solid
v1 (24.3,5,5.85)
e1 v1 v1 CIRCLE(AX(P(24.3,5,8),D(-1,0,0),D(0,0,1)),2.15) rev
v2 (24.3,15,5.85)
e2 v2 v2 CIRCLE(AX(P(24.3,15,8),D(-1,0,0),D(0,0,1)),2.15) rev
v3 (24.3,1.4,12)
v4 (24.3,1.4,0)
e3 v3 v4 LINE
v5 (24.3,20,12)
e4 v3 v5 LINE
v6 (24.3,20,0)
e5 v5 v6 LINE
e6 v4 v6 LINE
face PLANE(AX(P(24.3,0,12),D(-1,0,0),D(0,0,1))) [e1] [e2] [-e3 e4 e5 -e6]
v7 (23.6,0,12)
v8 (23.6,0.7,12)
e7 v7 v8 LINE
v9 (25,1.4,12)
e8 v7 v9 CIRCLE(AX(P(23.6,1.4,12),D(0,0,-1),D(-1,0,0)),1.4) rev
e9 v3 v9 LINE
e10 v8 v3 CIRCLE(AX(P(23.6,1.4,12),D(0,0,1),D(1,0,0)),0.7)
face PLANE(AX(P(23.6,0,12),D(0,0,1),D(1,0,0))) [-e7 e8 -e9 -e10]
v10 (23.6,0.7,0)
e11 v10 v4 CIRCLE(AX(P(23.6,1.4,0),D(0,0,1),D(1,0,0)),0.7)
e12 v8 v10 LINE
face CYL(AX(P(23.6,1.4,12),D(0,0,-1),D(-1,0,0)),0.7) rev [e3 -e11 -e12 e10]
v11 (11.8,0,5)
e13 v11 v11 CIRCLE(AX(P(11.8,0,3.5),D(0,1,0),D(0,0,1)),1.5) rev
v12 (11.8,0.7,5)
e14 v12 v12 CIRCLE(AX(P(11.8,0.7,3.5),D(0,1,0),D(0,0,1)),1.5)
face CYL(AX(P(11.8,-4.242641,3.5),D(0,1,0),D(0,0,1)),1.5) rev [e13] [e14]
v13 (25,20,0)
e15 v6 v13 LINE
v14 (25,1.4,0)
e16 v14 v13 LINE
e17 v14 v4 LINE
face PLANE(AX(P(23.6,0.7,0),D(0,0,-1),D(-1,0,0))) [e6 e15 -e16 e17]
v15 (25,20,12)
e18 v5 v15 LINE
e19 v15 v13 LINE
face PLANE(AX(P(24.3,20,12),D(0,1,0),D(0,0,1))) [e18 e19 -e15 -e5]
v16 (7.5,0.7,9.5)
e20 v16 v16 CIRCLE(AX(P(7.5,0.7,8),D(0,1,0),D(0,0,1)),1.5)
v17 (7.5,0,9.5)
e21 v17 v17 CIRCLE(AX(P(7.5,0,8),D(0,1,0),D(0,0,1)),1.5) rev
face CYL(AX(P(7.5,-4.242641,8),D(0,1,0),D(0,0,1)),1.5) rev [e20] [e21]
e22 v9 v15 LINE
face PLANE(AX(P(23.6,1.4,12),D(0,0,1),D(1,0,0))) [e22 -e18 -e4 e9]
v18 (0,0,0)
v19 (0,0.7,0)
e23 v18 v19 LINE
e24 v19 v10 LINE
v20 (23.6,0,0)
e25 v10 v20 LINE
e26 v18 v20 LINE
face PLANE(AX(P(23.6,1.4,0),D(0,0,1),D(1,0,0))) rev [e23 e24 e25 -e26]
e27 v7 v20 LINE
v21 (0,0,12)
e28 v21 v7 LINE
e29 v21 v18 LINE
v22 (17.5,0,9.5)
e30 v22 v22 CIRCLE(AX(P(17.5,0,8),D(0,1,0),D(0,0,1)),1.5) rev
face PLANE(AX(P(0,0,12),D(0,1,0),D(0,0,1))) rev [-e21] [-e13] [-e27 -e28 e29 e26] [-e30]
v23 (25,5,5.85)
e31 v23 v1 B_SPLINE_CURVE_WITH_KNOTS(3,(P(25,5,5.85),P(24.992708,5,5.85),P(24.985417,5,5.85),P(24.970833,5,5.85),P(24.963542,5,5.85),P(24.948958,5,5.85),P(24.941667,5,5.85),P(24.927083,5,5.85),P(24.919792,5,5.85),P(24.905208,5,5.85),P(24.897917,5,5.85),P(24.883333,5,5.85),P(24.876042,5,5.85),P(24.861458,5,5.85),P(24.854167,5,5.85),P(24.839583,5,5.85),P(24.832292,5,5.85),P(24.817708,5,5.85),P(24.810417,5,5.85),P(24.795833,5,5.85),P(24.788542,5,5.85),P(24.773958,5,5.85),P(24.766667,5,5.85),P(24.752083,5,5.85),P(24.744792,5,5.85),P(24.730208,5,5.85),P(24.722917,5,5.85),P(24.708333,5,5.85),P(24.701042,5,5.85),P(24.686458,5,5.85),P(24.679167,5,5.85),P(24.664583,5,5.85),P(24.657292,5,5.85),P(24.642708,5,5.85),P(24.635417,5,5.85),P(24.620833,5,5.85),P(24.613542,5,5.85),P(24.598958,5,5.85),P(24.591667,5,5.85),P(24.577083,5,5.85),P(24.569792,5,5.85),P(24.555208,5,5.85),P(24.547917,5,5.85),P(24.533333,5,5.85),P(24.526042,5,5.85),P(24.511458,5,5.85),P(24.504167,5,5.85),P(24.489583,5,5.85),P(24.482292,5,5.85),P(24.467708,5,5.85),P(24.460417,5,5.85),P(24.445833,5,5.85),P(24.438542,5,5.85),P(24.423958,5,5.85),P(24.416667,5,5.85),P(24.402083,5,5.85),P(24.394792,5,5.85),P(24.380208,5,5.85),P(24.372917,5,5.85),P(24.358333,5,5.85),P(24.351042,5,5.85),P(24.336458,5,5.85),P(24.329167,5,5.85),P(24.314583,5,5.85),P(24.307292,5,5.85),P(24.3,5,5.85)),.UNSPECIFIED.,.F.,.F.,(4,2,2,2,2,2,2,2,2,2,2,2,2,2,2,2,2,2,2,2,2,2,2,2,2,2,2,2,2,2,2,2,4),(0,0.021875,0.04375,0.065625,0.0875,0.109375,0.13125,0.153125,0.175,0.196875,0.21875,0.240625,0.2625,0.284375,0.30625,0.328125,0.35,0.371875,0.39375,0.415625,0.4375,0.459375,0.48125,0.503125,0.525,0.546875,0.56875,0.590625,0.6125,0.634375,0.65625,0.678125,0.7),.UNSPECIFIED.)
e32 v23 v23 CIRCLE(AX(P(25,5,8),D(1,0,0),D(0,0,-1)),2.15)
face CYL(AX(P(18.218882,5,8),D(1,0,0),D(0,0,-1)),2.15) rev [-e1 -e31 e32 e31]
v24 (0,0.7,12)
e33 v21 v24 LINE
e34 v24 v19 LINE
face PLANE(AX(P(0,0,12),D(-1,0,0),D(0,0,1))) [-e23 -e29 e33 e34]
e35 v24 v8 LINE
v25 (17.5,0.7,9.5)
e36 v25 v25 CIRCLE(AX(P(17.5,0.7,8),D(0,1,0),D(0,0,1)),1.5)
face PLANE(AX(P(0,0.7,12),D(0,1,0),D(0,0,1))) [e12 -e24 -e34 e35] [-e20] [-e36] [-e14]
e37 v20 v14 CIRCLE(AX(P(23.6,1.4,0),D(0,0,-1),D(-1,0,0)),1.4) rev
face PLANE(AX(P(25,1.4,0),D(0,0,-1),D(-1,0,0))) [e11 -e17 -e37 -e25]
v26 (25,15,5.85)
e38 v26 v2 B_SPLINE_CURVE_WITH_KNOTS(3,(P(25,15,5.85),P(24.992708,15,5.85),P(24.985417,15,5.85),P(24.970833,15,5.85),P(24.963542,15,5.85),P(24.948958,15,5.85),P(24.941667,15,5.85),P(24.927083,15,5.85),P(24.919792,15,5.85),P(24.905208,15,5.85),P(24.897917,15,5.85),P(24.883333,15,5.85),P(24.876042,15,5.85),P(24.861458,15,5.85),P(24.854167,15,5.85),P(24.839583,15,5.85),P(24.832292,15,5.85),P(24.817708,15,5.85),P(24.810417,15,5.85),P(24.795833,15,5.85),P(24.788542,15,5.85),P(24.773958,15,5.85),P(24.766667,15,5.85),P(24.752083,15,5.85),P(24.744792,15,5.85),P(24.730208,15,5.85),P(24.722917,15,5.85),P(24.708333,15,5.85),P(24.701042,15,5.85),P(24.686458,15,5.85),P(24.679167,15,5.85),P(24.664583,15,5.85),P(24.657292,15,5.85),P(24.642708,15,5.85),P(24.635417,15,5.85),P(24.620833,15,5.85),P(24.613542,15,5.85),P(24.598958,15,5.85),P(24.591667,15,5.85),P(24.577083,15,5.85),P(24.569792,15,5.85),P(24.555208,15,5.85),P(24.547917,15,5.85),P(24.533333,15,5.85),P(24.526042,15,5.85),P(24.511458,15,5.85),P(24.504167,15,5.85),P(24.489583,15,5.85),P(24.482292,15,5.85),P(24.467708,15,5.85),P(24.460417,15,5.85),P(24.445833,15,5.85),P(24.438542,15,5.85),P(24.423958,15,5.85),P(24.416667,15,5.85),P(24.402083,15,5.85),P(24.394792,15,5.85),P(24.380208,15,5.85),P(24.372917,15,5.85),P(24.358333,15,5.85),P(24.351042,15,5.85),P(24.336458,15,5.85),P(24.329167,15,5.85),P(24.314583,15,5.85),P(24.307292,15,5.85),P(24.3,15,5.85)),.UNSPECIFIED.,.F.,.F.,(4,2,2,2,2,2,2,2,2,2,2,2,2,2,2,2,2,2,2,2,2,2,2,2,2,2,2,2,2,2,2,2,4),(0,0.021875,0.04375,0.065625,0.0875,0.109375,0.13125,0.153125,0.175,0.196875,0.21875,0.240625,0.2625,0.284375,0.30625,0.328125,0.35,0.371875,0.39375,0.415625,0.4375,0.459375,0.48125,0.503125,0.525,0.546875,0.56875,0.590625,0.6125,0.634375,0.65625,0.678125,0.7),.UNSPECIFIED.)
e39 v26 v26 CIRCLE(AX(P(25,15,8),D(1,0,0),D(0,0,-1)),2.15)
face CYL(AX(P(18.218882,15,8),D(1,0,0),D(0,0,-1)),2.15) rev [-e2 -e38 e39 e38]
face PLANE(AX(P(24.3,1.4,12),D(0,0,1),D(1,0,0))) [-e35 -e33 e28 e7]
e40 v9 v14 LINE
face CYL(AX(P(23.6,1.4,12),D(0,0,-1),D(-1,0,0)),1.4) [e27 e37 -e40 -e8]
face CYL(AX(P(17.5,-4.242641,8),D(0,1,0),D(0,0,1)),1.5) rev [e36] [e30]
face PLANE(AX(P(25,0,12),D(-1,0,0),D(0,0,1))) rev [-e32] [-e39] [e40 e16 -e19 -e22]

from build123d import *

# Parameters (mm, degrees)
BASE_FLANGE1_DEPTH = 12
SKETCH6_R          = 1.5
CUT_EXTRUDE1_DEPTH = 0.7
SKETCH7_R          = 2.15
CUT_EXTRUDE2_DEPTH = 0.7


# Sheet-metal steps are written as plain solids
with BuildPart() as part:
    # Sketch1 → Base-Flange1 (new body)
    with BuildSketch(Plane.XY):
        with BuildLine():
            Line((0, 0), (23.6, 0))
            ThreePointArc((23.6, 0), (24.589949494, 0.410050506), (25, 1.4))
            Line((25, 1.4), (25, 20))
            Line((25, 20), (24.3, 20))
            Line((24.3, 20), (24.3, 1.4))
            ThreePointArc((24.3, 1.4), (24.094974747, 0.905025253), (23.6, 0.7))
            Line((23.6, 0.7), (0, 0.7))
            Line((0, 0.7), (0, 0))
        make_face()
    extrude(amount=BASE_FLANGE1_DEPTH)

    # Sketch6 → Cut-Extrude1 (cut)
    with BuildSketch(Plane(origin=(0, 0.7, 0), x_dir=(1, 0, 0), z_dir=(0, 1, 0))):
        with Locations(Location((7.5, -8, 0), (0, 0, 270))):
            Circle(SKETCH6_R)
        with Locations(Location((17.5, -8, 0), (0, 0, 270))):
            Circle(SKETCH6_R)
        with Locations(Location((11.8, -3.5, 0), (0, 0, 270))):
            Circle(SKETCH6_R)
    extrude(amount=-CUT_EXTRUDE1_DEPTH, mode=Mode.SUBTRACT)

    # Sketch7 → Cut-Extrude2 (cut)
    with BuildSketch(Plane(origin=(25, 0, 0), x_dir=(0, 0, -1), z_dir=(1, 0, 0))):
        with Locations((-8, 15)):
            Circle(SKETCH7_R)
        with Locations((-8, 5)):
            Circle(SKETCH7_R)
    extrude(amount=-CUT_EXTRUDE2_DEPTH, mode=Mode.SUBTRACT)


solid = part.part
